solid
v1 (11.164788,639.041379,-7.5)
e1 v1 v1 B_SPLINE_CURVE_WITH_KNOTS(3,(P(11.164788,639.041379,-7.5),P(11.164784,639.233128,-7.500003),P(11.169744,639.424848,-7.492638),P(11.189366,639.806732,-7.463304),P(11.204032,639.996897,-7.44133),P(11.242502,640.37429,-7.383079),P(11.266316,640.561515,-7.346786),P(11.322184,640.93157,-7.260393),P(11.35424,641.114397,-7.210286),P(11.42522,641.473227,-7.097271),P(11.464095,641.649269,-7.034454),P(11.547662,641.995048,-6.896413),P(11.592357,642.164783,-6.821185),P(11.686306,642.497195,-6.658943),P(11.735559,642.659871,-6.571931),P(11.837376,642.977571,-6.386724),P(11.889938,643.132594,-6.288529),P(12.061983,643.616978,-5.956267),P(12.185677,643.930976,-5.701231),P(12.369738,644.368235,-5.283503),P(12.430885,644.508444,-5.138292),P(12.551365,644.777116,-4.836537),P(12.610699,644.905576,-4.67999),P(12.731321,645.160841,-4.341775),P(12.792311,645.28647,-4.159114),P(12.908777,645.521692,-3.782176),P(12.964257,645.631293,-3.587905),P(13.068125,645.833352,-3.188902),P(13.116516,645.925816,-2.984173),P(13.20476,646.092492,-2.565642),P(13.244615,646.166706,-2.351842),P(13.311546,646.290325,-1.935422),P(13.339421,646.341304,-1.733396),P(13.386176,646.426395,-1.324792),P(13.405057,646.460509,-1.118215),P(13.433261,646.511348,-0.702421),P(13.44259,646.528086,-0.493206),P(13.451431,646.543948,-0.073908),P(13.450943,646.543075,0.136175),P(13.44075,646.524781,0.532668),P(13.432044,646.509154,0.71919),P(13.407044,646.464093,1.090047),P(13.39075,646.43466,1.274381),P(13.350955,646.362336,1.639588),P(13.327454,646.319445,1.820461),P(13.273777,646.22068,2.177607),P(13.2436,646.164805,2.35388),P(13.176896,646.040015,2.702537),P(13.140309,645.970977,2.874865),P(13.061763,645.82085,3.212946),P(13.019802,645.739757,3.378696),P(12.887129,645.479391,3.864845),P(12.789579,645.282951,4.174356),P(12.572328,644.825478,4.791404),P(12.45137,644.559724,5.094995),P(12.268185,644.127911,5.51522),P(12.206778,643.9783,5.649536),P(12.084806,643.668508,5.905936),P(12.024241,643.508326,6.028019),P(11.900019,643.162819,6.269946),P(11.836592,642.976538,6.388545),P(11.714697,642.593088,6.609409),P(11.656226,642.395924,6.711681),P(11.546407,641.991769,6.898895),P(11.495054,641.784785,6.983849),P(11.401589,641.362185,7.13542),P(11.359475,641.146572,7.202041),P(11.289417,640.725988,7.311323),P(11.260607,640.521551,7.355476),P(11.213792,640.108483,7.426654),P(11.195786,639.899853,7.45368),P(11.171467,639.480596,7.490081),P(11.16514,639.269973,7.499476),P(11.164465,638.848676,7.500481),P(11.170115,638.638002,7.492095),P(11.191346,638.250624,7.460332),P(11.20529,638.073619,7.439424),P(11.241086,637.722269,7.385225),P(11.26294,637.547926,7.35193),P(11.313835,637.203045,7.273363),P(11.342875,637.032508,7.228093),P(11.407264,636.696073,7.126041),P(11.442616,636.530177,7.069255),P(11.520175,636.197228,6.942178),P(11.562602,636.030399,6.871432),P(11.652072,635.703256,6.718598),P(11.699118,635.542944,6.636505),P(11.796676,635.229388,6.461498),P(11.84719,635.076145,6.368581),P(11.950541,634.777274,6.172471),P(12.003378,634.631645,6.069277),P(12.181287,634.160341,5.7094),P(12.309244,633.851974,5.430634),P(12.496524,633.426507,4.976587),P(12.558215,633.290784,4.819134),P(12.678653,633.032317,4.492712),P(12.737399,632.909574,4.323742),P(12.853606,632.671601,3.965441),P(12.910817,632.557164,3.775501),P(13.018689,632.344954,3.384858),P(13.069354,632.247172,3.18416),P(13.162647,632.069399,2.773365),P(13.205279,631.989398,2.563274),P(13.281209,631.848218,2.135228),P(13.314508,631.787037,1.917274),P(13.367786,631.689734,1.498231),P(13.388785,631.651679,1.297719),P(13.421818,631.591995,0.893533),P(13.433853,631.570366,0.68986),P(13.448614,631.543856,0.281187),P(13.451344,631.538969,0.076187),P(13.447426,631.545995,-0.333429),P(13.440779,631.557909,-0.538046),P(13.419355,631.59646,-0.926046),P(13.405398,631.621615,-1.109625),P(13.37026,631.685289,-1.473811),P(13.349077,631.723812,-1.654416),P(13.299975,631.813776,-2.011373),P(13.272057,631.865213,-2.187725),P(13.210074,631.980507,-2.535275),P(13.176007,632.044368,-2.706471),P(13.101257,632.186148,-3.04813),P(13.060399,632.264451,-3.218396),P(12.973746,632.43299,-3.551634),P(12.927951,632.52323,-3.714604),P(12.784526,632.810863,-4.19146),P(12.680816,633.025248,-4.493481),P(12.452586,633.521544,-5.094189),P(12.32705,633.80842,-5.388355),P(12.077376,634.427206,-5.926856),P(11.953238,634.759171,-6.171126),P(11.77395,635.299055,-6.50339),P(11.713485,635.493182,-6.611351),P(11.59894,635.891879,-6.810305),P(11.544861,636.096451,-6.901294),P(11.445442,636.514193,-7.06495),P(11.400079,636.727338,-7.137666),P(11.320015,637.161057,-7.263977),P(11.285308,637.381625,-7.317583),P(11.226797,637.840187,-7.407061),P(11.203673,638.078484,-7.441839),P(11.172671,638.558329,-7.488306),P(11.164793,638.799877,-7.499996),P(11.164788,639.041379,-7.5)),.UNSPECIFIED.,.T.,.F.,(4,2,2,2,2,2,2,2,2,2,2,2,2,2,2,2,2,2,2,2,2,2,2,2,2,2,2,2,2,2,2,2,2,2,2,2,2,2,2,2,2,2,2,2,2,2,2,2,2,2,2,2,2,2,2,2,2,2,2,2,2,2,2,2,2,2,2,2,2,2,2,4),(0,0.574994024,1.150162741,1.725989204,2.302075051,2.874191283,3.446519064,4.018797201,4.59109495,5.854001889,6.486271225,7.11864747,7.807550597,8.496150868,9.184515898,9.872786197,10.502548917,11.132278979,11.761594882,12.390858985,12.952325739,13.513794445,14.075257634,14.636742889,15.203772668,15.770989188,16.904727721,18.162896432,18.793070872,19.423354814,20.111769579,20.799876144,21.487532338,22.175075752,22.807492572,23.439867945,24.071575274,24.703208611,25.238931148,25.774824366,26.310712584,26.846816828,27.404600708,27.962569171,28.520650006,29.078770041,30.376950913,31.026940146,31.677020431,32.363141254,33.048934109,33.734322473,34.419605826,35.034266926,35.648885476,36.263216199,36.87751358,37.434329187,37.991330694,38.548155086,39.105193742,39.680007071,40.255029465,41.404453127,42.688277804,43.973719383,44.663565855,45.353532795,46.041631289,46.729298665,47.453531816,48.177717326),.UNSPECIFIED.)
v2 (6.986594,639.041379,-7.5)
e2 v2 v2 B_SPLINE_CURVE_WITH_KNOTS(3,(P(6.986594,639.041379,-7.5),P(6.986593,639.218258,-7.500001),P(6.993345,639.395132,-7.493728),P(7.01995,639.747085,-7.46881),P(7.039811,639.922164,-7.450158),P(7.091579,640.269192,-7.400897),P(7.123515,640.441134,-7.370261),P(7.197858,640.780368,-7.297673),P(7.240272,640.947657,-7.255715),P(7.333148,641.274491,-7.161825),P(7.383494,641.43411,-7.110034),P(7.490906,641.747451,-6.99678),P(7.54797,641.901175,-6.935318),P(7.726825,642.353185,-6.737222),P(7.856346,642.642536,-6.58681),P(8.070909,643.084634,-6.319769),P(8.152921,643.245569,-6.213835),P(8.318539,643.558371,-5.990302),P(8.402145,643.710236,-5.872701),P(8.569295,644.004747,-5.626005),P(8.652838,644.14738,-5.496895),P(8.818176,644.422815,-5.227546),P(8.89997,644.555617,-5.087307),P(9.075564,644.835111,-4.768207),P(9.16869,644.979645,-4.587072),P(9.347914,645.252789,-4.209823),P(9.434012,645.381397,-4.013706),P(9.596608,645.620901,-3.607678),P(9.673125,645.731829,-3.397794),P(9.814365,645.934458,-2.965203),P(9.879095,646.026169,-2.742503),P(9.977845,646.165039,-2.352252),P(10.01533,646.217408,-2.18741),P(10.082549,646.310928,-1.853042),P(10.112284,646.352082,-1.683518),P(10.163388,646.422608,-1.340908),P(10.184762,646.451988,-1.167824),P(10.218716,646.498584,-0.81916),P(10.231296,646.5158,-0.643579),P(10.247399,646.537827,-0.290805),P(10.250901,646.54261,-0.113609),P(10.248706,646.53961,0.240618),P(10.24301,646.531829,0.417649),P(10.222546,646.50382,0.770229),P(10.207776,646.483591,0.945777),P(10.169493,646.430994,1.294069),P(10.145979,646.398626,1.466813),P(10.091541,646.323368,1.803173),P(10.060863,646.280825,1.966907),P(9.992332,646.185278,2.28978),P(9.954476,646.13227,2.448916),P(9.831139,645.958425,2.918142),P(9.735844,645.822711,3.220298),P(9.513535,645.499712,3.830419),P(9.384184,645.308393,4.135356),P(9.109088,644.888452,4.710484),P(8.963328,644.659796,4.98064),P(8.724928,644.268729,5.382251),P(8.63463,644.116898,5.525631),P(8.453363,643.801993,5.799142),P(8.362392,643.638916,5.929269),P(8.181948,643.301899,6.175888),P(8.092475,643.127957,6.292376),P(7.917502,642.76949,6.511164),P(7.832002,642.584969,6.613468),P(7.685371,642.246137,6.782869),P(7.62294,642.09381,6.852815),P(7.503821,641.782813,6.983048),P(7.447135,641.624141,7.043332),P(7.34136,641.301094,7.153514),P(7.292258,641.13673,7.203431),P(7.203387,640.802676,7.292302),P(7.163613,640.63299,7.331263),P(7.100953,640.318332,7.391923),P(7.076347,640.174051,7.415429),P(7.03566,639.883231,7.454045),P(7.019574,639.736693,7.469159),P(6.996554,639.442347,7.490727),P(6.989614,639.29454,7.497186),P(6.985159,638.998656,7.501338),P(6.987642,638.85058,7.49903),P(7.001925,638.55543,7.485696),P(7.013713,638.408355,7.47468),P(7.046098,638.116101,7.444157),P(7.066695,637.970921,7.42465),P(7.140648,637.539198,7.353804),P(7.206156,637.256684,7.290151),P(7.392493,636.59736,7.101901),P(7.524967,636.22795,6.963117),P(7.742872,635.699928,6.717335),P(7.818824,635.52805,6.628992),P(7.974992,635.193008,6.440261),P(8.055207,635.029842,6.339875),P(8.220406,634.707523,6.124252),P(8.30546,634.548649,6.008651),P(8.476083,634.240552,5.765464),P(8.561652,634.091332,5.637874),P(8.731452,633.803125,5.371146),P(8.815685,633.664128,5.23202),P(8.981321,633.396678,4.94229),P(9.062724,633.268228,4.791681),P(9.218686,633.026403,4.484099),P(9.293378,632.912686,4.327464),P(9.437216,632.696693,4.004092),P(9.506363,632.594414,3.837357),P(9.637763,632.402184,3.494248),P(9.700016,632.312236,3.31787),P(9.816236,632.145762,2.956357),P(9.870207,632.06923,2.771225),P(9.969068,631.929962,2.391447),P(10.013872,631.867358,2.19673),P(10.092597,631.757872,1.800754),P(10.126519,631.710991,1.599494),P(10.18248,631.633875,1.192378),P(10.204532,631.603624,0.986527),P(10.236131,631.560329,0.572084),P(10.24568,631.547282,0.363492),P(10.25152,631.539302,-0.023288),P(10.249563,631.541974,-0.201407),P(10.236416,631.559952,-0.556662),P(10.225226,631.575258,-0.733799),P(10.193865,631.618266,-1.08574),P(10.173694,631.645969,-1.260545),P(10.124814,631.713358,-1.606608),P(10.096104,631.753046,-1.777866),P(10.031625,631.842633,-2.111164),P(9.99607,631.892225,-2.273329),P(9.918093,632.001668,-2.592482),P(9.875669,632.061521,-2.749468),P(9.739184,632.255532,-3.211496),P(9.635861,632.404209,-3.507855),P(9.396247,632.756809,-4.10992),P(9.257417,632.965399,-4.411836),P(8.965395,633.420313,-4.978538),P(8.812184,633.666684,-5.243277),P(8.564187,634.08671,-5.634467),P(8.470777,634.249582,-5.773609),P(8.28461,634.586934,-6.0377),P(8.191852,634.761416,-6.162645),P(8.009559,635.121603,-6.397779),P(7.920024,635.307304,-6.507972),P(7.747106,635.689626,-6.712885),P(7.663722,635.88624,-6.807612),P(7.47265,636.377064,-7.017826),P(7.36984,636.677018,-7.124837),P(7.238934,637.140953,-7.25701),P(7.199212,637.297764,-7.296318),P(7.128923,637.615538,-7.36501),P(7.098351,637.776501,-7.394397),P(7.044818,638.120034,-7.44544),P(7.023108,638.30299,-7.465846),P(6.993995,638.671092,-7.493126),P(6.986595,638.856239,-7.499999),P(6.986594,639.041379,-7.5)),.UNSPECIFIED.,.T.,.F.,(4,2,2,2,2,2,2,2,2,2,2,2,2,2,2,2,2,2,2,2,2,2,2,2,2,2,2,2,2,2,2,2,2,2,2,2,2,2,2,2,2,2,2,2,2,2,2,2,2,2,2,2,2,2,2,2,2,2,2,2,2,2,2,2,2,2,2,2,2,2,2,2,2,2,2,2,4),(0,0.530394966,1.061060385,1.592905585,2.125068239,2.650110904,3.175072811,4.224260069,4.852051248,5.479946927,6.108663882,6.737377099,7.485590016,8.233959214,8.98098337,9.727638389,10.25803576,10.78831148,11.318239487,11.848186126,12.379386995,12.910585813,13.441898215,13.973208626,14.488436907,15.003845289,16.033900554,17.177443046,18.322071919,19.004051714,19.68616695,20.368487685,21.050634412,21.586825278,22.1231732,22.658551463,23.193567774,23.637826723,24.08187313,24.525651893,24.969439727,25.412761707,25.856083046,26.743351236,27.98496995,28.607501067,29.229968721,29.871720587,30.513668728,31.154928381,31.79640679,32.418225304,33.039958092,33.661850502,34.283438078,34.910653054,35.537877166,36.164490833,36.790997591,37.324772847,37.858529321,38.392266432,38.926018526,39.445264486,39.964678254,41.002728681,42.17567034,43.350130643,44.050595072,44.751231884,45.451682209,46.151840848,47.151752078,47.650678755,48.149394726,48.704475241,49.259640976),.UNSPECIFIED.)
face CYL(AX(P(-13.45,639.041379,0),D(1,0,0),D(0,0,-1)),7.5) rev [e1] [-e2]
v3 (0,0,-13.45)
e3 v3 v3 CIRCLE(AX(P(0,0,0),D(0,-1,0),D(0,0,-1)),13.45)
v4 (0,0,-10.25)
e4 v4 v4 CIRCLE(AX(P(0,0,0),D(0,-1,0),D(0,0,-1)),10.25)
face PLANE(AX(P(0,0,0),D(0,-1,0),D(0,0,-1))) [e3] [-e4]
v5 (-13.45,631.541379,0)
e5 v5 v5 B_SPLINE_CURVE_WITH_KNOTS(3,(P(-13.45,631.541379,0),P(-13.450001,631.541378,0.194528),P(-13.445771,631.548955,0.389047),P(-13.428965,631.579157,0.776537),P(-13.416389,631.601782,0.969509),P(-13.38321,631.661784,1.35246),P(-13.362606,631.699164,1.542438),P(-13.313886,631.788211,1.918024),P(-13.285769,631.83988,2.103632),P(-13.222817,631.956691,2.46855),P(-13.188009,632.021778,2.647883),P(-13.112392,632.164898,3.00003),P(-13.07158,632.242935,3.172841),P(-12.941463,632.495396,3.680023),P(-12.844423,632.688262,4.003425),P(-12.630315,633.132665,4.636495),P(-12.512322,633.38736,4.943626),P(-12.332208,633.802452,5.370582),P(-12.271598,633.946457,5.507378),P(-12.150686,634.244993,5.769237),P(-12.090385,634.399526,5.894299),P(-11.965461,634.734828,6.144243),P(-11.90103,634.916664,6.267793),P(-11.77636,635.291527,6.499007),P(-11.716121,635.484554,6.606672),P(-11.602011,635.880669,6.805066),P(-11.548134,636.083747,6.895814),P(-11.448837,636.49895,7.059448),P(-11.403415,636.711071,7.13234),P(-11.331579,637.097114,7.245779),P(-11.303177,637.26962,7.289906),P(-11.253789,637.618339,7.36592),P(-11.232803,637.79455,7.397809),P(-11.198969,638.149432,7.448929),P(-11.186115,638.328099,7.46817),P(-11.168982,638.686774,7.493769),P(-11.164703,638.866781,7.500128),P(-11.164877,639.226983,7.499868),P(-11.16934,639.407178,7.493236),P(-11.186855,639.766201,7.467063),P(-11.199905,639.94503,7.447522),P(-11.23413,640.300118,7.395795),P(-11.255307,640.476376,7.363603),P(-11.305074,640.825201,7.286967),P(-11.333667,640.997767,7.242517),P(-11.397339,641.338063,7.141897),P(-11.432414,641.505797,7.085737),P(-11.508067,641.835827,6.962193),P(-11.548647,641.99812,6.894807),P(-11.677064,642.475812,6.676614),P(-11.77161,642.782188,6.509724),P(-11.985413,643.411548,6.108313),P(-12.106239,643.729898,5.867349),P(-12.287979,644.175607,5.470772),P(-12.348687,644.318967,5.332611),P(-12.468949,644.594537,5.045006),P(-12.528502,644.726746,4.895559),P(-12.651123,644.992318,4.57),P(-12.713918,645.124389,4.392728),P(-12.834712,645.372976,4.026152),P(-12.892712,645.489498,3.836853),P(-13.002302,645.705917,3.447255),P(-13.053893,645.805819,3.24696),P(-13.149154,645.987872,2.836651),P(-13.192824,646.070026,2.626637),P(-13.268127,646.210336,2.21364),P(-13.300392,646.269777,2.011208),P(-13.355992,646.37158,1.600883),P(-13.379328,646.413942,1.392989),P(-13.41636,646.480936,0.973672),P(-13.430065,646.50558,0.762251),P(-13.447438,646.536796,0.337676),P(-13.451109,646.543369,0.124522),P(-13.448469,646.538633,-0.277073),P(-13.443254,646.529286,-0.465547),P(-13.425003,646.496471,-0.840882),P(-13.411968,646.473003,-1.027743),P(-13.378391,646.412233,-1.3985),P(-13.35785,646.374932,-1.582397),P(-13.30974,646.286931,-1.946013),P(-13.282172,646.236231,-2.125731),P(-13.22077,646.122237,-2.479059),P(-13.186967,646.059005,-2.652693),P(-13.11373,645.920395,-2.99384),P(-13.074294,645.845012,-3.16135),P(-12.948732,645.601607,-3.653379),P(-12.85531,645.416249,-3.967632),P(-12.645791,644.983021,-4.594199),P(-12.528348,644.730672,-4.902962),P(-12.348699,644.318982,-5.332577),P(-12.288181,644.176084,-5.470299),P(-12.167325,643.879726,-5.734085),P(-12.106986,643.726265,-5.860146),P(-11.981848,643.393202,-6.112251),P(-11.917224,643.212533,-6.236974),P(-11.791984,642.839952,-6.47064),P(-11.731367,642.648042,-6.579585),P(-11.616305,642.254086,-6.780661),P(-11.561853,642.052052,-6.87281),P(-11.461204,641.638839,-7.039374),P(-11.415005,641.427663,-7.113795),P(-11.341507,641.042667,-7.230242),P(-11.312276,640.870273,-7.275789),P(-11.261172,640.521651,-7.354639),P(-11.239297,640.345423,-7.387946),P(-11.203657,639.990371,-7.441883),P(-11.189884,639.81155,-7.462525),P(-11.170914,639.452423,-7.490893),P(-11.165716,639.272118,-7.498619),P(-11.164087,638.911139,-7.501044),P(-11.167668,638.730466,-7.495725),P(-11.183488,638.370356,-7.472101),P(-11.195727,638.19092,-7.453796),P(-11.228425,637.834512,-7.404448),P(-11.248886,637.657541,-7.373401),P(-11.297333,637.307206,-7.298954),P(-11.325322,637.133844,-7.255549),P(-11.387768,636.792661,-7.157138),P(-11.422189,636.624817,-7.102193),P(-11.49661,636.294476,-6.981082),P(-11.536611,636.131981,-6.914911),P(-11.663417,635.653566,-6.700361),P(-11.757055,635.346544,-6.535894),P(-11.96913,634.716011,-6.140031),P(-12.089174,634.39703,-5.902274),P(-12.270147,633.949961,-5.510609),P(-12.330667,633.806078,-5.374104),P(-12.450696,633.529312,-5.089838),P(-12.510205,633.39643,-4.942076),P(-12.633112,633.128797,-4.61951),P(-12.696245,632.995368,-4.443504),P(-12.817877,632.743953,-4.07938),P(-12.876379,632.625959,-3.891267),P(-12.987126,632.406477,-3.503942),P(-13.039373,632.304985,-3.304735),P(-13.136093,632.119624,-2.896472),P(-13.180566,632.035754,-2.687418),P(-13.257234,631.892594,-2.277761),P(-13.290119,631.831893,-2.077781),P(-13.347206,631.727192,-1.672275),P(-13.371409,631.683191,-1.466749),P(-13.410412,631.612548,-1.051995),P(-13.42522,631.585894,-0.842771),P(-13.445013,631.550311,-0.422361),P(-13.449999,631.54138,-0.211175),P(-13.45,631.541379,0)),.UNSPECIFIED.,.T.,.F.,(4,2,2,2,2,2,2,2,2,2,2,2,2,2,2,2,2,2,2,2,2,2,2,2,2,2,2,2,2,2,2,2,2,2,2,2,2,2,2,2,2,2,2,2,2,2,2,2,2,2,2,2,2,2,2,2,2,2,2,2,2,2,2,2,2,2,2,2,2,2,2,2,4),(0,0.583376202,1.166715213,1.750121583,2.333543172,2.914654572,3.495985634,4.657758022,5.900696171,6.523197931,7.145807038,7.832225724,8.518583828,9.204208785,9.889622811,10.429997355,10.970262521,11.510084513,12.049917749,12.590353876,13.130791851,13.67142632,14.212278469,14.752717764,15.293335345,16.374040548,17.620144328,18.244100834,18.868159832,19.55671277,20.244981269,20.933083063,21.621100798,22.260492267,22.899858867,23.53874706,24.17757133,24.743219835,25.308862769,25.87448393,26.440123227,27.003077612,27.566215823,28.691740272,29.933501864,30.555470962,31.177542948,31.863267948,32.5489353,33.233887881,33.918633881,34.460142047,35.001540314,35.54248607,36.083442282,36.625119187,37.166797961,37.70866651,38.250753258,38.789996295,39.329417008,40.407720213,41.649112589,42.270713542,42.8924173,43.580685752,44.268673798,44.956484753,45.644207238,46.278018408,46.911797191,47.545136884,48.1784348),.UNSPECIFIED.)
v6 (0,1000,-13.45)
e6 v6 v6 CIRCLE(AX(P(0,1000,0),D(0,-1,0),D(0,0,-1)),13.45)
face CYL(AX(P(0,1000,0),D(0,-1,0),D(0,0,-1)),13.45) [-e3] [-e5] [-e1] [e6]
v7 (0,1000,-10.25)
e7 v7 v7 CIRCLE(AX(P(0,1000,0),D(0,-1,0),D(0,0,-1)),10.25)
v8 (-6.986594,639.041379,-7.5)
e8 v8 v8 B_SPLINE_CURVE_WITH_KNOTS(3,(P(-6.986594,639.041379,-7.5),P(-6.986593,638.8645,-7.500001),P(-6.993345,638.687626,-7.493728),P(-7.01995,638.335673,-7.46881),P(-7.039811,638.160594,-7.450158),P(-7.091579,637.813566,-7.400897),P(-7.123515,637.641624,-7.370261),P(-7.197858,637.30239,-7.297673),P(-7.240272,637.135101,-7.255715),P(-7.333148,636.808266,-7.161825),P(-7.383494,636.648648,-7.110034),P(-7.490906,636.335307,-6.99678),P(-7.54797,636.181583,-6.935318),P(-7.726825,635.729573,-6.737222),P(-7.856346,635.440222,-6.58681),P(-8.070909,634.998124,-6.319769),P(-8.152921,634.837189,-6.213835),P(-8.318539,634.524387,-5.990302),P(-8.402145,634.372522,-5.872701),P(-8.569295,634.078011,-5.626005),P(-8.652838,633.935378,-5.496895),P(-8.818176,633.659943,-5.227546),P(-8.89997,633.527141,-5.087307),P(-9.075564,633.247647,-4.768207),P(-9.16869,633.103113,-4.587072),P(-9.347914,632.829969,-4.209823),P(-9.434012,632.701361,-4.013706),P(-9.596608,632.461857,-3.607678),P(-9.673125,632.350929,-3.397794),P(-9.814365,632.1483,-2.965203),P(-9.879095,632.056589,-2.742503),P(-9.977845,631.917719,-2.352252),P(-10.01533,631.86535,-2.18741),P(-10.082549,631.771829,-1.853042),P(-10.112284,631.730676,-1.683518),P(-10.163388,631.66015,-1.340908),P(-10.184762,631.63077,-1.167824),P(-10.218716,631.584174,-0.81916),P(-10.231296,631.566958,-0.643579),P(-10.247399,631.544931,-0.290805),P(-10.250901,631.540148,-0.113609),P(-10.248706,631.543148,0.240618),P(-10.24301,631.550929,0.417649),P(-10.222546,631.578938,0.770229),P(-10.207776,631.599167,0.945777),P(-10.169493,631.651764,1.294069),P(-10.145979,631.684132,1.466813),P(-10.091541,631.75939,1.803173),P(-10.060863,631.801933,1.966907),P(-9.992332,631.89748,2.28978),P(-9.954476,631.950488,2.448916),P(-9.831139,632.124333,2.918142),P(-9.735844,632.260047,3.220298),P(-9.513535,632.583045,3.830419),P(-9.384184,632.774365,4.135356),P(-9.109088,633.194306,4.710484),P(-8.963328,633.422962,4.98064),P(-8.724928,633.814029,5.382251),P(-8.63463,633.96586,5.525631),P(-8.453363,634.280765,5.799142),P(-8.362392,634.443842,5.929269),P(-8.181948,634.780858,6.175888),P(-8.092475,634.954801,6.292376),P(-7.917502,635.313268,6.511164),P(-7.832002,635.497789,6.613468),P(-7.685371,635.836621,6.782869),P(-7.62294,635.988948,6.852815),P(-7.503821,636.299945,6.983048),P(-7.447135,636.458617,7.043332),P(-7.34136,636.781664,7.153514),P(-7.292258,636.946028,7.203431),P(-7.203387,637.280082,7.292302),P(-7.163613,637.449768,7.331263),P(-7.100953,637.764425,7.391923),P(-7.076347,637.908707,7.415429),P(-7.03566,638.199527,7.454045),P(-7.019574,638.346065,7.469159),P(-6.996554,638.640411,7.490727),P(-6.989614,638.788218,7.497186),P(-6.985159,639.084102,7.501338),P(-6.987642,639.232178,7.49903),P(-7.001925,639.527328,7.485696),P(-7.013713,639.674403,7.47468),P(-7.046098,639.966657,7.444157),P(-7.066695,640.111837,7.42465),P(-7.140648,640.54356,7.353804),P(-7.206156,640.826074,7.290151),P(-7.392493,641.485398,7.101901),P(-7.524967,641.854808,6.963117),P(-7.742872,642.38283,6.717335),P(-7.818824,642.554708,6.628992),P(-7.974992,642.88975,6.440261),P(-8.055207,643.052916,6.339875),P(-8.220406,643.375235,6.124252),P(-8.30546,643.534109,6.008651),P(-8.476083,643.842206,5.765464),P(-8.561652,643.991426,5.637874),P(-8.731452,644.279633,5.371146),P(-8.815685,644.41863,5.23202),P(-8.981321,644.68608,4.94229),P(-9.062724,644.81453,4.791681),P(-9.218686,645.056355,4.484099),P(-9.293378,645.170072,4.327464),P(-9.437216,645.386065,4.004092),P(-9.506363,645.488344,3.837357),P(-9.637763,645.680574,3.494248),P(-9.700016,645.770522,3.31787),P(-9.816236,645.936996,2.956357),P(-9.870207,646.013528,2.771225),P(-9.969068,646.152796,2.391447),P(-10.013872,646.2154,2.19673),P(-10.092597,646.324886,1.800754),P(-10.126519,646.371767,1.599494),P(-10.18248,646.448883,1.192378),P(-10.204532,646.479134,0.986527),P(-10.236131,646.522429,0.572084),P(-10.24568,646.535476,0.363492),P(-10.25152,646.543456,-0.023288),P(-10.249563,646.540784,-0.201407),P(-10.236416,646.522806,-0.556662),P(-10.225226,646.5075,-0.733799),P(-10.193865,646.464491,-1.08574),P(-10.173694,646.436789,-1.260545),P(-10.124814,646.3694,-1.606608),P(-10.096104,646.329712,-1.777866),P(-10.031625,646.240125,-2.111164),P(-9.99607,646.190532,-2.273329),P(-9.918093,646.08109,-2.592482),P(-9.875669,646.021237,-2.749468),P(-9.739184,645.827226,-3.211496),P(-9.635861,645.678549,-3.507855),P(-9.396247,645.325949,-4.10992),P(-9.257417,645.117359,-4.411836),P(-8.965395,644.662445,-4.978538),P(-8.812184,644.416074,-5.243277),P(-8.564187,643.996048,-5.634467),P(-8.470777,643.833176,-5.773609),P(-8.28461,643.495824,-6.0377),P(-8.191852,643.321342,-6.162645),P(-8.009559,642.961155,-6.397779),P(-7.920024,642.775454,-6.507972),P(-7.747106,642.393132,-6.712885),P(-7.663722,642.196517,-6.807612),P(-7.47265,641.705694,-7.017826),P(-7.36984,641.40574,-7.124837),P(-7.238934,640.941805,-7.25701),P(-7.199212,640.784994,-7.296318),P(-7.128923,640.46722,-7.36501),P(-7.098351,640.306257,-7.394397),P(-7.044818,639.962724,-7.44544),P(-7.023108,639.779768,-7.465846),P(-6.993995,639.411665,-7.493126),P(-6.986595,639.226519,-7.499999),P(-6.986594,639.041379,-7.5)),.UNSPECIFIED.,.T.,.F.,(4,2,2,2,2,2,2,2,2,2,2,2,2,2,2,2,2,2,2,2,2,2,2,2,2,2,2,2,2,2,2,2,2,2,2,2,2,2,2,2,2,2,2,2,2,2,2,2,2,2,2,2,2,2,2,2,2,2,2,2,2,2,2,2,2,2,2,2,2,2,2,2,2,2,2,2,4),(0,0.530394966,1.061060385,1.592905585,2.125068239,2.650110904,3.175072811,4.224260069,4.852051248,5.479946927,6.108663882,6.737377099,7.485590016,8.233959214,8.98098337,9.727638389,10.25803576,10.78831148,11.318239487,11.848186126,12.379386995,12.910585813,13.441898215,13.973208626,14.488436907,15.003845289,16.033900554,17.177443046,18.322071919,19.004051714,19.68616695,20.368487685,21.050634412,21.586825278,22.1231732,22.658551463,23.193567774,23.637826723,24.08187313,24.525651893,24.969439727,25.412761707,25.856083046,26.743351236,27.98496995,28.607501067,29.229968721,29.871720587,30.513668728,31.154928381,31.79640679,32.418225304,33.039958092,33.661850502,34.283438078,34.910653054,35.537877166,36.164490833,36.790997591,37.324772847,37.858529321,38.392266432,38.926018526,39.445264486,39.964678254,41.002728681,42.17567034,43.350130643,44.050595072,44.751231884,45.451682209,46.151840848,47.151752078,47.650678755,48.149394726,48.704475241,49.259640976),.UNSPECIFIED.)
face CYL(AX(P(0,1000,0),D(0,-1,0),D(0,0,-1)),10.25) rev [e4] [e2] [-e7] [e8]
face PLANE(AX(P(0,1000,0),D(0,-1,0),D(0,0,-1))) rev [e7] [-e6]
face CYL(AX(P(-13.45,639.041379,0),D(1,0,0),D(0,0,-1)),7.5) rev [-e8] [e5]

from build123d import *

# Parameters (mm, degrees)
STRUCTURE_SYSTEM1_OUTLINE_R   = 13.45
STRUCTURE_SYSTEM1_OUTLINE_R_2 = 10.25
STRUCTURE_SYSTEM1_DEPTH       = 1000
CUT_EXTRUDE1_DEPTH            = 1001.18088614
CUT_EXTRUDE1_DEPTH_BACK       = 1001.18088614
SKETCH12_R                    = 7.5


# Read off the part's stored shape, not the designer's step: Structure System1
with BuildPart() as part:
    # Structure System1 outline → Structure System1 (new body)
    with BuildSketch(Plane(origin=(0, 0, 0), x_dir=(1, 0, 0), z_dir=(0, 1, 0))):
        Circle(STRUCTURE_SYSTEM1_OUTLINE_R)
        Circle(STRUCTURE_SYSTEM1_OUTLINE_R_2, mode=Mode.SUBTRACT)
    extrude(amount=STRUCTURE_SYSTEM1_DEPTH)

    # Sketch12 → Cut-Extrude1 (cut, two sides: drawn at the far end of the back side and taken through both)
    with BuildSketch(Plane(origin=(0, 0, 0), x_dir=(0, 0, -1), z_dir=(1, 0, 0)).offset(-CUT_EXTRUDE1_DEPTH_BACK)):
        with Locations((0, 639.041378949)):
            Circle(SKETCH12_R)
    extrude(amount=CUT_EXTRUDE1_DEPTH + CUT_EXTRUDE1_DEPTH_BACK, mode=Mode.SUBTRACT)


solid = part.part
